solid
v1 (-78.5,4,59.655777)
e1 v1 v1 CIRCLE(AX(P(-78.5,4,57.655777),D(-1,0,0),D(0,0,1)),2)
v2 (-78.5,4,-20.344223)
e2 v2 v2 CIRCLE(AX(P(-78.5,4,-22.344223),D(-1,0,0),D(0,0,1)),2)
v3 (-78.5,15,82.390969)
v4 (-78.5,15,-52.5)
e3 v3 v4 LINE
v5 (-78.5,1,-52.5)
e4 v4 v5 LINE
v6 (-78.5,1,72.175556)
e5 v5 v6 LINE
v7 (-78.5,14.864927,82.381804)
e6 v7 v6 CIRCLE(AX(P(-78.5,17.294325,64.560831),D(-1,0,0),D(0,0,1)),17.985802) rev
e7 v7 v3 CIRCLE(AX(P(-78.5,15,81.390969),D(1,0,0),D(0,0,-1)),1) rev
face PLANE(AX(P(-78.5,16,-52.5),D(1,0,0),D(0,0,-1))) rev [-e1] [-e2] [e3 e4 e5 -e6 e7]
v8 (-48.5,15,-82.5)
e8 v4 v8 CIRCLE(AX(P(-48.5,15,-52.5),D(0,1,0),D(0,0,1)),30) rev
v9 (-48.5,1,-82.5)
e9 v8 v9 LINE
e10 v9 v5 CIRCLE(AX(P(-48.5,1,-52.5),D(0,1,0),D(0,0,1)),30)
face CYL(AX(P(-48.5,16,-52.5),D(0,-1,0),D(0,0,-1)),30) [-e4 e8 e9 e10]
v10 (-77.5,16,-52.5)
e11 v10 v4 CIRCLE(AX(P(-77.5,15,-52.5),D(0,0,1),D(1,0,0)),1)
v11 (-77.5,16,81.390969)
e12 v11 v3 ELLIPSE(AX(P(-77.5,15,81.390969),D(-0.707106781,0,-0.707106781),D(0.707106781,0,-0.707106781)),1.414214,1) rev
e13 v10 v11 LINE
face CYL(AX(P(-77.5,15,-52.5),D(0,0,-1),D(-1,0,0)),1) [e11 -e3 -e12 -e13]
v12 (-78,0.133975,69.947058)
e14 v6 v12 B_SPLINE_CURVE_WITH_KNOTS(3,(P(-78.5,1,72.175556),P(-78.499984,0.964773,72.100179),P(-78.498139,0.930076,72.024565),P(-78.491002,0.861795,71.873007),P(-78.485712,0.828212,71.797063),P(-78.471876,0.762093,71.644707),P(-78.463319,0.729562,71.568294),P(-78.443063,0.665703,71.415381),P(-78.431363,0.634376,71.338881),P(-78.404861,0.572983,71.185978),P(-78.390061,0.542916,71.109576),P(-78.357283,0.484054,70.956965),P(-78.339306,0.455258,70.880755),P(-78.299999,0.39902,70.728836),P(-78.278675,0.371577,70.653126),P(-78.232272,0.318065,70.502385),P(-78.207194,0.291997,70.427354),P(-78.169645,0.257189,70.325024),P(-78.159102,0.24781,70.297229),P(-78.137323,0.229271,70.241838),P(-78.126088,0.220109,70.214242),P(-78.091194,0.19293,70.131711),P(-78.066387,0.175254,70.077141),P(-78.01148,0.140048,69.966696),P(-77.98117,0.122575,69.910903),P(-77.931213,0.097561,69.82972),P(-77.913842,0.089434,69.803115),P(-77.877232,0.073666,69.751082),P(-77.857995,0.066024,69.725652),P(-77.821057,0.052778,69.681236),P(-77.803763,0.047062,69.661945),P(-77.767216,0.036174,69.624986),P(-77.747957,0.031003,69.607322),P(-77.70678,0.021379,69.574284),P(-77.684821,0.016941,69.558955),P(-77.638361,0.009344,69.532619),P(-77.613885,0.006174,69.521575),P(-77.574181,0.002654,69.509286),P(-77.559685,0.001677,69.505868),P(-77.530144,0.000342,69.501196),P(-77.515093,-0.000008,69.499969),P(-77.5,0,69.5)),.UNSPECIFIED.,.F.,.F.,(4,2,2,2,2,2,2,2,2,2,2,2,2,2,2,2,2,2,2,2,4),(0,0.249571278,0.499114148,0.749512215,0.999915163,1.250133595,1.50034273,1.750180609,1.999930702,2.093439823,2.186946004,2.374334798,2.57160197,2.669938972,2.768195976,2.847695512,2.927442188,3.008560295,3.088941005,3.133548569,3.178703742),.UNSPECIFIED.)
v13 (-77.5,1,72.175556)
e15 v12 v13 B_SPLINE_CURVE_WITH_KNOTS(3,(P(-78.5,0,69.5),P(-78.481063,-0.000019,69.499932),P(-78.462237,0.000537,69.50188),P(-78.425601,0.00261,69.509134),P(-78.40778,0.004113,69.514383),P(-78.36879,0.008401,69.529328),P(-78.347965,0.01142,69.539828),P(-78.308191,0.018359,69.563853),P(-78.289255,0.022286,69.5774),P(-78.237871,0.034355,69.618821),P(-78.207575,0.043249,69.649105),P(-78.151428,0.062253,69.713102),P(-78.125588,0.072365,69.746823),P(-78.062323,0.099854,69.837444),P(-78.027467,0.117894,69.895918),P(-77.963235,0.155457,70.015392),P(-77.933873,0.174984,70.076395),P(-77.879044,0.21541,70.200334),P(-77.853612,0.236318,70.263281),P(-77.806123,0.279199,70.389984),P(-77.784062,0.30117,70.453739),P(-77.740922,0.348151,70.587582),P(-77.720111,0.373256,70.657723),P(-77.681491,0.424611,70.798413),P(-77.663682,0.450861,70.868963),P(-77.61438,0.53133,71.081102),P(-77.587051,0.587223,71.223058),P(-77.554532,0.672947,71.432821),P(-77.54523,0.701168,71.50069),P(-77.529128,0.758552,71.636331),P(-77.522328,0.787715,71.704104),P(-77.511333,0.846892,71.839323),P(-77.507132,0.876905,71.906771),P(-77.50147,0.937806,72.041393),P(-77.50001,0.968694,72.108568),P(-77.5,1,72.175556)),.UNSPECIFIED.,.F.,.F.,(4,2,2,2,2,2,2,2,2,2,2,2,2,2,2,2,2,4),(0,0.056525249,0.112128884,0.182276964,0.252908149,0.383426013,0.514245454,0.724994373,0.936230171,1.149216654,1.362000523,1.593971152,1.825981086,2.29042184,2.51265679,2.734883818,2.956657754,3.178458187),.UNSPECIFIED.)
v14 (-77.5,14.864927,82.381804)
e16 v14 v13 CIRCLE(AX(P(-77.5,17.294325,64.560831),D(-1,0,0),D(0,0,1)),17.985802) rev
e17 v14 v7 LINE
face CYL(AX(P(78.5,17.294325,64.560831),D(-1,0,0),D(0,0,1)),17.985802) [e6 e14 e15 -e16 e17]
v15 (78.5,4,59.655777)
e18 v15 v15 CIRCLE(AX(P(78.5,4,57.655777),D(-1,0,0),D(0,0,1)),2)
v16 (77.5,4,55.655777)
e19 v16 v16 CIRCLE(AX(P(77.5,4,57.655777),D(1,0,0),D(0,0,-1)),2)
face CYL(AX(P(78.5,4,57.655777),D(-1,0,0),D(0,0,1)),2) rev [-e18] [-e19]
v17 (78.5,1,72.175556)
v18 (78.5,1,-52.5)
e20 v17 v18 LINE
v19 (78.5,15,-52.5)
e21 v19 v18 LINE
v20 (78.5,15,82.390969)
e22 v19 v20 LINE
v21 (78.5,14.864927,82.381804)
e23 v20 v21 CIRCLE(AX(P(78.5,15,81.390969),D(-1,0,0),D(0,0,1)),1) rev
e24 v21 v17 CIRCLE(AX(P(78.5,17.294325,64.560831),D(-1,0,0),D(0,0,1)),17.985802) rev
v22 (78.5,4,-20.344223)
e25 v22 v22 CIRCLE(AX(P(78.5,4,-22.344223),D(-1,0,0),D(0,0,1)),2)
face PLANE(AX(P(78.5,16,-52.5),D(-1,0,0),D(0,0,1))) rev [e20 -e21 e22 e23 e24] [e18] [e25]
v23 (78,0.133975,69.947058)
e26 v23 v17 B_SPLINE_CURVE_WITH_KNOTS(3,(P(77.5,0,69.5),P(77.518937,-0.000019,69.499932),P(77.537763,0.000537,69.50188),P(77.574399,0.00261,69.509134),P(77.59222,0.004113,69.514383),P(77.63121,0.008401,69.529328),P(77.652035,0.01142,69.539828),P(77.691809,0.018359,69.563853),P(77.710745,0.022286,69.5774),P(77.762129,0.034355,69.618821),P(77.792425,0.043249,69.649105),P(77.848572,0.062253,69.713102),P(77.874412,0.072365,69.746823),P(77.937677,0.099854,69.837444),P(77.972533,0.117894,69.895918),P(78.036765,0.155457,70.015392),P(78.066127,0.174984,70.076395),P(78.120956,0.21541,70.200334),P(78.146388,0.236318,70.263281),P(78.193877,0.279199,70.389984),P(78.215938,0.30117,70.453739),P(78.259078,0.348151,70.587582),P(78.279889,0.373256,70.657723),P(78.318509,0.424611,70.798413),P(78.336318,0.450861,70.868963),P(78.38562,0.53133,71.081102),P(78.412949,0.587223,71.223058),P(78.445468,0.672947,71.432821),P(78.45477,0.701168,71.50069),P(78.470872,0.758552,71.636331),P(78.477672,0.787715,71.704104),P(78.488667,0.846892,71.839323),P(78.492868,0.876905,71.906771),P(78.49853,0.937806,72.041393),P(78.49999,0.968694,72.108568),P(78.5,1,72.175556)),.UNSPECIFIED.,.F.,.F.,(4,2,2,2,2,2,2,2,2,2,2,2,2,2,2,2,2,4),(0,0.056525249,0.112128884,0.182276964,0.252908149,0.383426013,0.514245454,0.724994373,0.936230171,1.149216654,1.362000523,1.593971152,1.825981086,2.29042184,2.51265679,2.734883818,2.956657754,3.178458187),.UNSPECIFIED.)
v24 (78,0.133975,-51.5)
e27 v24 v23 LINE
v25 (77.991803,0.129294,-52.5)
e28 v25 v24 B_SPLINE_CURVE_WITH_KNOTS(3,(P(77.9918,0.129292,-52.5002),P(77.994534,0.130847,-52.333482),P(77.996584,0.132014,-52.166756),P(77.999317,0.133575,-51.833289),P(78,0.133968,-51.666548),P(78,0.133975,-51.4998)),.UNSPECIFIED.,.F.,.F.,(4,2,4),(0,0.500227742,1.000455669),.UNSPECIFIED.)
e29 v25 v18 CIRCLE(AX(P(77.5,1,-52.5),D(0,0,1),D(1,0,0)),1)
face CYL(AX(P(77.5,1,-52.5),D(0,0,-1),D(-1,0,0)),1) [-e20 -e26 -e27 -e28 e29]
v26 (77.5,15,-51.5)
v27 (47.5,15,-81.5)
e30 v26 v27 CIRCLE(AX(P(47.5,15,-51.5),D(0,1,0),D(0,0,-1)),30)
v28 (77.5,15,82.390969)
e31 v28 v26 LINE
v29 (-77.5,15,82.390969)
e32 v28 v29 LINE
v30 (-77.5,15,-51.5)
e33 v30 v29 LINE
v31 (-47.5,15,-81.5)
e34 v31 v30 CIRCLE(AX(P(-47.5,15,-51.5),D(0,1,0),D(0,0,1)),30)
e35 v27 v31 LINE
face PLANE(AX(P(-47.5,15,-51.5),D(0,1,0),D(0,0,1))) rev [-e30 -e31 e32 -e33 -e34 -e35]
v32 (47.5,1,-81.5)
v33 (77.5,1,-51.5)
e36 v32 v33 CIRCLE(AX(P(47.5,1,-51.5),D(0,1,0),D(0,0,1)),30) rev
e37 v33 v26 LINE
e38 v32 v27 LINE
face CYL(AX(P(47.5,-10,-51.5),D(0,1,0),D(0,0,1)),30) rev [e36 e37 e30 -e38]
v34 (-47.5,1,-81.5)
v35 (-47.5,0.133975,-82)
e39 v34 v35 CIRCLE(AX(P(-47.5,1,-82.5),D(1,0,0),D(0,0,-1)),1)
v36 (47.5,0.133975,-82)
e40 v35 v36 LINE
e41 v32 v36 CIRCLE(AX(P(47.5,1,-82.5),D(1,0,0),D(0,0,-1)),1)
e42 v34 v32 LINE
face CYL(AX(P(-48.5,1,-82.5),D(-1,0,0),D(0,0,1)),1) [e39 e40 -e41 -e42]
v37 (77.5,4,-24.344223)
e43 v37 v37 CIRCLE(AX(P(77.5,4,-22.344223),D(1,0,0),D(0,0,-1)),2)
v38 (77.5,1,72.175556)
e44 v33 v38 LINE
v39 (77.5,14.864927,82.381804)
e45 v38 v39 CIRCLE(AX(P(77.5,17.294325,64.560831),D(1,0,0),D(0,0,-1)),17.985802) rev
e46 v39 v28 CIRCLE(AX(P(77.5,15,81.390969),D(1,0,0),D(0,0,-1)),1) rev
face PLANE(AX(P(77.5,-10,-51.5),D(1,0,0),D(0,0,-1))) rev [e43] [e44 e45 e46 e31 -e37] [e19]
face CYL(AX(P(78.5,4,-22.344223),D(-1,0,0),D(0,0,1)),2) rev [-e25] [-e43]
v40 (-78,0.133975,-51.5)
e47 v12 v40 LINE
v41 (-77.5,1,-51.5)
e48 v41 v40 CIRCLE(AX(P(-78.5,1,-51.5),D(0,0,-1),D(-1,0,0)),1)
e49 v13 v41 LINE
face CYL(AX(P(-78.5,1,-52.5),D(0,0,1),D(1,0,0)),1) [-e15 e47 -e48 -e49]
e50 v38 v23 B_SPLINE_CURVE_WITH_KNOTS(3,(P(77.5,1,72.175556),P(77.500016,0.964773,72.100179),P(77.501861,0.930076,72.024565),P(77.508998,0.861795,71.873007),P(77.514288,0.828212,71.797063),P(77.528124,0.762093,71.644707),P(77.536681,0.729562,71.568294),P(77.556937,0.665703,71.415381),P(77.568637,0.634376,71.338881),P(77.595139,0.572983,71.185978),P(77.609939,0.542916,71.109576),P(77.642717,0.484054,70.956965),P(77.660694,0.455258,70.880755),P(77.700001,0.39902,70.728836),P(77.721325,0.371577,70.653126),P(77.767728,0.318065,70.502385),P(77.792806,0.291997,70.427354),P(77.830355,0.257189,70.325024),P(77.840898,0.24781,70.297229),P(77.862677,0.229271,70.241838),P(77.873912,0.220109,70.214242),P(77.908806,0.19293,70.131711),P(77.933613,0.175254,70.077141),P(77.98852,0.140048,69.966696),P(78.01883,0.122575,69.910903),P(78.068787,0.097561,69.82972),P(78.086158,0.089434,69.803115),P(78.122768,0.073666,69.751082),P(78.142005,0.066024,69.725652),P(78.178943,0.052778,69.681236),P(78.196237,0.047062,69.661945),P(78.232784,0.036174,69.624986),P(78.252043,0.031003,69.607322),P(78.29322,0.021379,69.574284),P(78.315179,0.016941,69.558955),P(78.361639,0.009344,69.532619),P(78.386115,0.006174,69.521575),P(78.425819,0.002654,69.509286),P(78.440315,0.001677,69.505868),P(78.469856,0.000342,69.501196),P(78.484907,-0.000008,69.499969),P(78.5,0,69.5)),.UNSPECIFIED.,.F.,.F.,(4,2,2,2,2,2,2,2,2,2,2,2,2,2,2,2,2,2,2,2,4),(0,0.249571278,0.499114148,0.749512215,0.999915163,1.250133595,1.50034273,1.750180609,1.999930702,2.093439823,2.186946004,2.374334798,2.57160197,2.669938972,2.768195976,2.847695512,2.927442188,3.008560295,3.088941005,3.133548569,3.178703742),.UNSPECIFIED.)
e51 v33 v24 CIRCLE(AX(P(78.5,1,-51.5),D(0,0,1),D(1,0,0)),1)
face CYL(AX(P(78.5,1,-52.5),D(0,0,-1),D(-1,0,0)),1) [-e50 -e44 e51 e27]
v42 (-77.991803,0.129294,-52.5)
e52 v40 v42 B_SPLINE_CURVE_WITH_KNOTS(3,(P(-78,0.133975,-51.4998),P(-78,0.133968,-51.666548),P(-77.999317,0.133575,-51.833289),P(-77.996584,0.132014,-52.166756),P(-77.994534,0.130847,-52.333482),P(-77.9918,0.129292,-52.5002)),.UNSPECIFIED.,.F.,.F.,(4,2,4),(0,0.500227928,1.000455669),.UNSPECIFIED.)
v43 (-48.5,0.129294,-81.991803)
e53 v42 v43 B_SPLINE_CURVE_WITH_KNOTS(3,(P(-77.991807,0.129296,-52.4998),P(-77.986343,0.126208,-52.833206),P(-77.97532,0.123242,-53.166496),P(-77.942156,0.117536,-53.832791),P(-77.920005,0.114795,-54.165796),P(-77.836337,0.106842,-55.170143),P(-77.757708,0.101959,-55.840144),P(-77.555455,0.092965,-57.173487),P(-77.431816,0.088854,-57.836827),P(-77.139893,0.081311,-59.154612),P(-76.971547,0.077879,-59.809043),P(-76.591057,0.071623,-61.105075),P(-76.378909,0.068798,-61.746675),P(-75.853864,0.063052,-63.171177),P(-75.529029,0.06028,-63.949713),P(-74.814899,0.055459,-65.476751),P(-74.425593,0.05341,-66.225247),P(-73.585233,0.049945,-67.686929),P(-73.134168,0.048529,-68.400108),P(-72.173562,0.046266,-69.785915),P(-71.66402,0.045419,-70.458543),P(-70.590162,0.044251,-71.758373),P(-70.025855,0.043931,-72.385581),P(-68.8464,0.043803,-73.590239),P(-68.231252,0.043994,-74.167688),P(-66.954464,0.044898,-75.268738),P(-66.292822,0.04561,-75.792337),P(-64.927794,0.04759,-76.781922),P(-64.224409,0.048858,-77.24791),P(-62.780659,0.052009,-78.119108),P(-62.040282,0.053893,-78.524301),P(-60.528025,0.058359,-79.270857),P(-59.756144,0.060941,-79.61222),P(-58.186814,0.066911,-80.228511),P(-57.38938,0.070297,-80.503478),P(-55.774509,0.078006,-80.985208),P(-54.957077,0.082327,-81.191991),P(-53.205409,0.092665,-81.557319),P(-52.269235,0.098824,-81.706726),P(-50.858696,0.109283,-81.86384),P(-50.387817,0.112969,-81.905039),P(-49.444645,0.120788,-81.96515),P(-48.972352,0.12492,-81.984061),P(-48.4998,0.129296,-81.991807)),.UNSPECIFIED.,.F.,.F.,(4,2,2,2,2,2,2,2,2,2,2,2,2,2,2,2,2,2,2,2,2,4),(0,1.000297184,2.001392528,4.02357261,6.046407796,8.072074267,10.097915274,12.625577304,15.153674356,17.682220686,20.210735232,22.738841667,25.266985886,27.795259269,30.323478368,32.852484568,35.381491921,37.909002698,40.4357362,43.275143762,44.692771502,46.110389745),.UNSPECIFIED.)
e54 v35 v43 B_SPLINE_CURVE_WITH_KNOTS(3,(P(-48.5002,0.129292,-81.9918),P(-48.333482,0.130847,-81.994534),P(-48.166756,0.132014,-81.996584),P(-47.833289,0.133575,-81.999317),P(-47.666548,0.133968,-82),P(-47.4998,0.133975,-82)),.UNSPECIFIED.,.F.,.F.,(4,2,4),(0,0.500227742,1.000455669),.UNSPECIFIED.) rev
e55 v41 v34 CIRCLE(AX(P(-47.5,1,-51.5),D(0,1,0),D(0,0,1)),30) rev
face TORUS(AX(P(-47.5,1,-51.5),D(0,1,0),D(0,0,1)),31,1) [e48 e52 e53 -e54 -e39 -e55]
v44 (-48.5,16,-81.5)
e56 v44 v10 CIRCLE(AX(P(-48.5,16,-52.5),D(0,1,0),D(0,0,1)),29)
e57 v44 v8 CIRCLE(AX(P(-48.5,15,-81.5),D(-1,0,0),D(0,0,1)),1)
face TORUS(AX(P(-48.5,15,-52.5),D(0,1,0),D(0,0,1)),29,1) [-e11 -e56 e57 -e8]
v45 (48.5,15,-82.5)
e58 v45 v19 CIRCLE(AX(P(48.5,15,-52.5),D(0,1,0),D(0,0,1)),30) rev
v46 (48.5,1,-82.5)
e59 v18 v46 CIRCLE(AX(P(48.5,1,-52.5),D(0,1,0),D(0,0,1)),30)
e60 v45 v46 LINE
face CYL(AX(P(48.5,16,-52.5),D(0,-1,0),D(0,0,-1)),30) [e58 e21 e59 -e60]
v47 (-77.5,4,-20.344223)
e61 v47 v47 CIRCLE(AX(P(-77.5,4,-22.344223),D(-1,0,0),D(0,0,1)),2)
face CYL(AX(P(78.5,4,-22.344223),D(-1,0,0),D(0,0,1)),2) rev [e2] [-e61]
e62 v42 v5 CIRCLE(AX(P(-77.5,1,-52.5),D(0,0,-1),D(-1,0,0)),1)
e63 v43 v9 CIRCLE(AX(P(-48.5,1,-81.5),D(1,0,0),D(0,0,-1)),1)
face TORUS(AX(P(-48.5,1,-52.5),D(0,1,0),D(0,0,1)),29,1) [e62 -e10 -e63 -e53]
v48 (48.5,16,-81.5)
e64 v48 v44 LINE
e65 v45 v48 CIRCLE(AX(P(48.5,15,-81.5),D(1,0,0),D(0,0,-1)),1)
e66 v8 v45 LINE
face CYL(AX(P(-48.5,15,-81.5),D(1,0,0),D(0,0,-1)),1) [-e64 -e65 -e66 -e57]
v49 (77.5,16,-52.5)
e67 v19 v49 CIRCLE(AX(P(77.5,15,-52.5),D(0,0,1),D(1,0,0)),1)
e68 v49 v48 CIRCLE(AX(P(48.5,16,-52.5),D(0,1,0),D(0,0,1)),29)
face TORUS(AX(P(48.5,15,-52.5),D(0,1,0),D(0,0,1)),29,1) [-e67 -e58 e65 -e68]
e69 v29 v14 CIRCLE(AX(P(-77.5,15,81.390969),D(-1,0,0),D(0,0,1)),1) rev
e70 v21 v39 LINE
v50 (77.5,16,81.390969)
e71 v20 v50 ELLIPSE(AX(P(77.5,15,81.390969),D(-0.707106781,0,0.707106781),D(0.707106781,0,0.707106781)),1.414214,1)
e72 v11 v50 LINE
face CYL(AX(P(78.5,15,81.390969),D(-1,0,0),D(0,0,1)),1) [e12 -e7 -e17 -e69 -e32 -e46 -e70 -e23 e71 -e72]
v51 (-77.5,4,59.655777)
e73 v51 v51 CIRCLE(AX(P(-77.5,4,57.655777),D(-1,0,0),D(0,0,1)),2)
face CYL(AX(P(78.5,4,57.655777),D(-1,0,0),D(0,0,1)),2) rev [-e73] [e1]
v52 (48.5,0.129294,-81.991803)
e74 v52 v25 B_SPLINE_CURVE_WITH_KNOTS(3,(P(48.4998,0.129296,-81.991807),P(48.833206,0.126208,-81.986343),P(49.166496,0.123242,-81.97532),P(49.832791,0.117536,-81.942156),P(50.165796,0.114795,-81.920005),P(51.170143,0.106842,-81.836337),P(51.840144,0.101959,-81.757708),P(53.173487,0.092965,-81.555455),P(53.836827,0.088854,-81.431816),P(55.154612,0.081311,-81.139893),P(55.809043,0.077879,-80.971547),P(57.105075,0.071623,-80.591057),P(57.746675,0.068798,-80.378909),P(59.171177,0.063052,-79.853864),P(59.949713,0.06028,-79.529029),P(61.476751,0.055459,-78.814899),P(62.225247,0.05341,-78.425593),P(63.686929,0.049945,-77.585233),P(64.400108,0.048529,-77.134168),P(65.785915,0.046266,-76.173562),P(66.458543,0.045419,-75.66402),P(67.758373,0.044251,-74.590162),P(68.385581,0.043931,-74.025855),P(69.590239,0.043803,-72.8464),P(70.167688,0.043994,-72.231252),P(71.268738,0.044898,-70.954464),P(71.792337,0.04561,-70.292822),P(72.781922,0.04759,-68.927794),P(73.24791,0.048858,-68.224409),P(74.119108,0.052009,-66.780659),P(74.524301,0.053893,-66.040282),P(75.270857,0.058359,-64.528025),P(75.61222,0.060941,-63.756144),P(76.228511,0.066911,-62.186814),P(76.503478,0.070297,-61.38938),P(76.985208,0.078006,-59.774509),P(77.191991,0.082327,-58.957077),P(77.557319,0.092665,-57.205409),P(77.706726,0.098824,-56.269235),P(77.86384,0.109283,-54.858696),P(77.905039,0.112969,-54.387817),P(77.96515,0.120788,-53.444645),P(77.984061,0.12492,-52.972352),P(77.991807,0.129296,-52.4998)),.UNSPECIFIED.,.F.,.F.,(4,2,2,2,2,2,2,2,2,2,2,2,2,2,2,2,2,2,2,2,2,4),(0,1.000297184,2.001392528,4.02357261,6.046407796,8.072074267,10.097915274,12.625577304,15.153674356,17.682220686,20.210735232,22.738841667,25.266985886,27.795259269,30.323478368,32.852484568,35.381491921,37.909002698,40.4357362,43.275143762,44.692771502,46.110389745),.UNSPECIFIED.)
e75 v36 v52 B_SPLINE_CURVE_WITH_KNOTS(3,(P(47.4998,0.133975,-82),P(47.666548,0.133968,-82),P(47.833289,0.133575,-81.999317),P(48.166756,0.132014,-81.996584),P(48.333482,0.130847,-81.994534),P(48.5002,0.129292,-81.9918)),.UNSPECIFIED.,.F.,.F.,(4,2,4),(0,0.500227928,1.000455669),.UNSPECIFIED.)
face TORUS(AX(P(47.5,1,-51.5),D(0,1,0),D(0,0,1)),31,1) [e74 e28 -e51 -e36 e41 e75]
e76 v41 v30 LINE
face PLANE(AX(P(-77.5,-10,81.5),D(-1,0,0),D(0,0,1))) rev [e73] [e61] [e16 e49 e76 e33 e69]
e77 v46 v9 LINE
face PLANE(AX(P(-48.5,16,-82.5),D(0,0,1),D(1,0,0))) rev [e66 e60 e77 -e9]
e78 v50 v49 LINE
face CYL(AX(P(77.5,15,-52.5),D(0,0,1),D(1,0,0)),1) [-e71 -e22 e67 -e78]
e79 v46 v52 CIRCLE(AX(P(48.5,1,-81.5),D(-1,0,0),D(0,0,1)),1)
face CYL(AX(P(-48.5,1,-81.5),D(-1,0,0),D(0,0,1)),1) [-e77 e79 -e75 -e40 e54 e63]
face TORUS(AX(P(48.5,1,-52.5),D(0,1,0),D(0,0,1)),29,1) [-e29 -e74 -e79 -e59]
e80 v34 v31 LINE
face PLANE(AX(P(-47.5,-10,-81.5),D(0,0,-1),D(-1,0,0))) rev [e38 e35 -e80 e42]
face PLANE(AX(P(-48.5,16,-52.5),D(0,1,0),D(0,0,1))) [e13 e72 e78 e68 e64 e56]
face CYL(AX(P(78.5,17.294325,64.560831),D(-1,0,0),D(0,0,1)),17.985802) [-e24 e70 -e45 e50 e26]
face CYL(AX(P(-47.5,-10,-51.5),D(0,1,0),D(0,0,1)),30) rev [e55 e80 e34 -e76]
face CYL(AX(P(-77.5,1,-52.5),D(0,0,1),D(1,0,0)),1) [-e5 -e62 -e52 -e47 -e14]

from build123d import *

# Parameters (mm, degrees)
BOSS_EXTRUDE1_DEPTH = 16
CUT_EXTRUDE1_START  = -1
CUT_EXTRUDE1_DEPTH  = 25
SKETCH5_R           = 2.000000000000003
CUT_EXTRUDE3_DEPTH  = 179.07652849266802
CUT_EXTRUDE4_DEPTH  = 179.07652849266802
FILLET1_R           = 1


with BuildPart() as part:
    # Sketch1 → Boss-Extrude1 (new body)
    with BuildSketch(Plane(origin=(0, 0, 0), x_dir=(1, 0, 0), z_dir=(0, 1, 0))):
        with BuildLine():
            Line((-48.499999999999986, 82.49999999999999), (48.500000000000014, 82.50000000000001))
            ThreePointArc((48.500000000000014, 82.50000000000001), (69.71320343559644, 73.71320343559644), (78.5, 52.500000000000014))
            Line((78.5, 52.500000000000014), (78.50000000000003, -82.5))
            Line((78.50000000000003, -82.5), (-78.49999999999997, -82.5))
            Line((-78.49999999999997, -82.5), (-78.5, 52.5))
            ThreePointArc((-78.5, 52.5), (-69.7132034355964, 73.71320343559643), (-48.499999999999986, 82.49999999999999))
        make_face()
    extrude(amount=BOSS_EXTRUDE1_DEPTH)

    # Sketch2 → Cut-Extrude1 (cut)
    with BuildSketch(Plane(origin=(0, 16, 0), x_dir=(1, 0, 0), z_dir=(0, 1, 0)).offset(CUT_EXTRUDE1_START)):
        with BuildLine():
            Line((-47.5, 81.5), (47.50000000000003, 81.50000000000003))
            ThreePointArc((47.50000000000003, 81.50000000000003), (68.71320343559645, 72.71320343559645), (77.50000000000003, 51.50000000000003))
            Line((77.50000000000003, 51.50000000000003), (77.50000000000004, -81.50000000000006))
            Line((77.50000000000004, -81.50000000000006), (77.50000000000006, -82.5))
            Line((77.50000000000006, -82.5), (75.39281372987732, -82.49999999999999))
            Line((75.39281372987732, -82.49999999999999), (-77.49999999999997, -82.5))
            Line((-77.49999999999997, -82.5), (-77.49999999999997, -81.49999999999997))
            Line((-77.49999999999997, -81.49999999999997), (-77.49999999999999, 51.500000000000014))
            ThreePointArc((-77.49999999999999, 51.500000000000014), (-68.71320343559641, 72.71320343559643), (-47.5, 81.5))
        make_face()
    extrude(amount=-CUT_EXTRUDE1_DEPTH, mode=Mode.SUBTRACT)

    # Sketch5 → Cut-Extrude3 (cut, through all)
    with BuildSketch(Plane.ZY.offset(78.49999999999999)):
        with Locations((-22.344222660164835, 4)):
            Circle(SKETCH5_R)
        with Locations((57.65577733983517, 4)):
            Circle(SKETCH5_R)
    extrude(amount=-CUT_EXTRUDE3_DEPTH, mode=Mode.SUBTRACT)

    # Sketch6 → Cut-Extrude4 (cut, through all)
    with BuildSketch(Plane.ZY.offset(78.49999999999999)):
        with BuildLine():
            ThreePointArc((82.49999999999999, 16), (78.51986342800406, 5.952610964746691), (69.49999999999999, -3.55e-15))
            Line((69.49999999999999, 0), (82.49999999999999, 0))
            Line((82.49999999999999, 0), (82.49999999999999, 16))
        make_face()
    extrude(amount=-CUT_EXTRUDE4_DEPTH, mode=Mode.SUBTRACT)

    # Fillet1
    # the kernel refuses this fillet: 1 mm, written as the material it takes off along each edge
    with BuildSketch(Plane(origin=(77.50000000000004, 0, 73.74999999999997), x_dir=(1, 0, -1.1e-16), z_dir=(-1.1e-16, 0, -1)), Plane(origin=(-77.49999999999997, 0, -51.5), x_dir=(-1, 0, 0), z_dir=(0, 0, 1))) as fillet1_piece_1:
        with BuildLine():
            CenterArc((FILLET1_R, -FILLET1_R), FILLET1_R, 90, 90)
            Line((0, -FILLET1_R), (0, 0))
            Line((0, 0), (FILLET1_R, 0))
        make_face()
    extrude(amount=125.25, mode=Mode.SUBTRACT)
    with BuildSketch(Plane(origin=(47.50000000000003, 0, -51.50000000000003), x_dir=(1, 0, 2.4e-16), z_dir=(-2.4e-16, 0, 1))) as fillet1_piece_2:
        with BuildLine():
            CenterArc((30 + FILLET1_R, FILLET1_R), FILLET1_R, 180, 90)
            Line((30, FILLET1_R), (30, 0))
            Line((30, 0), (30 + FILLET1_R, 0))
        make_face()
    revolve(axis=Axis((47.50000000000003, 0, -51.50000000000003), (0, 1, 0)), revolution_arc=90, mode=Mode.SUBTRACT)
    with BuildSketch(Plane(origin=(47.50000000000003, 0, -81.50000000000003), x_dir=(-3e-16, 0, -1), z_dir=(-1, 0, 3e-16))) as fillet1_piece_3:
        with BuildLine():
            CenterArc((FILLET1_R, -FILLET1_R), FILLET1_R, 90, 90)
            Line((0, -FILLET1_R), (0, 0))
            Line((0, 0), (FILLET1_R, 0))
        make_face()
    extrude(amount=95.00000000000003, mode=Mode.SUBTRACT)
    with BuildSketch(Plane(origin=(-47.499999999999986, 0, -51.5), x_dir=(-2.4e-16, 0, -1), z_dir=(1, 0, -2.4e-16))) as fillet1_piece_4:
        with BuildLine():
            CenterArc((30 + FILLET1_R, FILLET1_R), FILLET1_R, 180, 90)
            Line((30, FILLET1_R), (30, 0))
            Line((30, 0), (30 + FILLET1_R, 0))
        make_face()
    revolve(axis=Axis((-47.499999999999986, 0, -51.5), (0, 1, 0)), revolution_arc=89.99999999999994, mode=Mode.SUBTRACT)
    with BuildSketch(Plane(origin=(78.5, 0, -52.500000000000014), x_dir=(-1, 0, 2.1e-16), z_dir=(2.1e-16, 0, 1))) as fillet1_piece_5:
        with BuildLine():
            CenterArc((FILLET1_R, -FILLET1_R), FILLET1_R, 90, 90)
            Line((0, -FILLET1_R), (0, 0))
            Line((0, 0), (FILLET1_R, 0))
        make_face()
    extrude(amount=126.24999999999999, mode=Mode.SUBTRACT)
    with BuildSketch(Plane(origin=(48.50000000000004, 0, -52.50000000000006), x_dir=(-9.5e-16, 0, -1), z_dir=(-1, 0, 9.5e-16))) as fillet1_piece_6:
        with BuildLine():
            CenterArc((29.999999999999943 - FILLET1_R, -FILLET1_R), FILLET1_R, 1.272e-14, 90)
            Line((29.999999999999943, -FILLET1_R), (29.999999999999943, 0))
            Line((29.999999999999943, 0), (29.999999999999943 - FILLET1_R, 0))
        make_face()
    revolve(axis=Axis((48.50000000000004, 0, -52.50000000000006), (0, -1, 0)), revolution_arc=90.00000000000014, mode=Mode.SUBTRACT)
    with BuildSketch(Plane(origin=(-48.499999999999986, 0, -82.49999999999999), x_dir=(0, 1, 0), z_dir=(1, 0, -2.9e-16))) as fillet1_piece_7:
        with BuildLine():
            CenterArc((FILLET1_R, FILLET1_R), FILLET1_R, 180, 90)
            Line((-1.1e-16, FILLET1_R), (0, 0))
            Line((0, 0), (FILLET1_R, 0))
        make_face()
    extrude(amount=97, mode=Mode.SUBTRACT)
    with BuildSketch(Plane(origin=(-48.49999999999997, 0, -52.49999999999995), x_dir=(-1, 0, -1.66e-15), z_dir=(-1.66e-15, 0, 1))) as fillet1_piece_8:
        with BuildLine():
            CenterArc((30.00000000000003 - FILLET1_R, -FILLET1_R), FILLET1_R, 0, 90)
            Line((30.00000000000003 - FILLET1_R, 1.1e-16), (30.00000000000003, 0))
            Line((30.00000000000003, 0), (30.00000000000003, -FILLET1_R))
        make_face()
    revolve(axis=Axis((-48.49999999999997, 0, -52.49999999999995), (0, -1, 0)), revolution_arc=89.99999999999989, mode=Mode.SUBTRACT)
    with BuildSketch(Plane(origin=(-78.49999999999997, 16, 85), x_dir=(0, -1, 0), z_dir=(-2.1e-16, 0, -1))) as fillet1_piece_9:
        with BuildLine():
            CenterArc((FILLET1_R, -FILLET1_R), FILLET1_R, 90, 90)
            Line((0, -FILLET1_R), (0, 0))
            Line((0, 0), (FILLET1_R, 0))
        make_face()
    extrude(amount=137.5, mode=Mode.SUBTRACT)
    with BuildSketch(Plane(origin=(-48.49999999999997, 16, -52.49999999999995), x_dir=(-1, 0, -1.66e-15), z_dir=(-1.66e-15, 0, 1))) as fillet1_piece_10:
        with BuildLine():
            CenterArc((30.00000000000003 - FILLET1_R, FILLET1_R), FILLET1_R, 270, 90)
            Line((30.00000000000003 - FILLET1_R, 0), (30.00000000000003, 0))
            Line((30.00000000000003, 0), (30.00000000000003, FILLET1_R))
        make_face()
    revolve(axis=Axis((-48.49999999999997, 16, -52.49999999999995), (0, -1, 0)), revolution_arc=89.99999999999989, mode=Mode.SUBTRACT)
    with BuildSketch(Plane(origin=(-48.499999999999986, 16, -82.49999999999999), x_dir=(0, -1, 0), z_dir=(1, 0, -2.9e-16))) as fillet1_piece_11:
        with BuildLine():
            CenterArc((FILLET1_R, -FILLET1_R), FILLET1_R, 90, 90)
            Line((0, -FILLET1_R), (0, 0))
            Line((0, 0), (FILLET1_R, 0))
        make_face()
    extrude(amount=97, mode=Mode.SUBTRACT)
    with BuildSketch(Plane(origin=(48.50000000000004, 16, -52.50000000000006), x_dir=(-9.5e-16, 0, -1), z_dir=(-1, 0, 9.5e-16))) as fillet1_piece_12:
        with BuildLine():
            CenterArc((29.999999999999943 - FILLET1_R, FILLET1_R), FILLET1_R, 270, 90)
            Line((29.999999999999943, FILLET1_R), (29.999999999999943, 0))
            Line((29.999999999999943, 0), (29.999999999999943 - FILLET1_R, 0))
        make_face()
    revolve(axis=Axis((48.50000000000004, 16, -52.50000000000006), (0, -1, 0)), revolution_arc=90.00000000000014, mode=Mode.SUBTRACT)
    with BuildSketch(Plane(origin=(78.5, 16, -52.500000000000014), x_dir=(-1, 0, 2.1e-16), z_dir=(2.1e-16, 0, 1))) as fillet1_piece_13:
        with BuildLine():
            CenterArc((FILLET1_R, FILLET1_R), FILLET1_R, 180, 90)
            Line((0, FILLET1_R), (0, 0))
            Line((0, 0), (FILLET1_R, 0))
        make_face()
    extrude(amount=137.5, mode=Mode.SUBTRACT)
    with BuildSketch(Plane(origin=(-78.49999999999997, 0, 73.75), x_dir=(0, 1, 0), z_dir=(-2.1e-16, 0, -1))) as fillet1_piece_14:
        with BuildLine():
            CenterArc((FILLET1_R, FILLET1_R), FILLET1_R, 180, 90)
            Line((-1.1e-16, FILLET1_R), (0, 0))
            Line((0, 0), (FILLET1_R, 0))
        make_face()
    extrude(amount=126.25, mode=Mode.SUBTRACT)
    with BuildSketch(Plane(origin=(81.35302601856634, 16, 82.5), x_dir=(0, 0, -1), z_dir=(-1, 0, 0))) as fillet1_piece_15:
        with BuildLine():
            CenterArc((1.1090314143661004, 1), FILLET1_R, 172.23715283019968, 97.76284716980035)
            ThreePointArc((0.11819577889333743, 1.135073104196561), (0.05009298550456265, 0.5684742376371492), (0, 0))
            Line((0, 0), (1.1090314143661004, 0))
        make_face()
    extrude(amount=162.70605203713265, mode=Mode.SUBTRACT)


solid = part.part
